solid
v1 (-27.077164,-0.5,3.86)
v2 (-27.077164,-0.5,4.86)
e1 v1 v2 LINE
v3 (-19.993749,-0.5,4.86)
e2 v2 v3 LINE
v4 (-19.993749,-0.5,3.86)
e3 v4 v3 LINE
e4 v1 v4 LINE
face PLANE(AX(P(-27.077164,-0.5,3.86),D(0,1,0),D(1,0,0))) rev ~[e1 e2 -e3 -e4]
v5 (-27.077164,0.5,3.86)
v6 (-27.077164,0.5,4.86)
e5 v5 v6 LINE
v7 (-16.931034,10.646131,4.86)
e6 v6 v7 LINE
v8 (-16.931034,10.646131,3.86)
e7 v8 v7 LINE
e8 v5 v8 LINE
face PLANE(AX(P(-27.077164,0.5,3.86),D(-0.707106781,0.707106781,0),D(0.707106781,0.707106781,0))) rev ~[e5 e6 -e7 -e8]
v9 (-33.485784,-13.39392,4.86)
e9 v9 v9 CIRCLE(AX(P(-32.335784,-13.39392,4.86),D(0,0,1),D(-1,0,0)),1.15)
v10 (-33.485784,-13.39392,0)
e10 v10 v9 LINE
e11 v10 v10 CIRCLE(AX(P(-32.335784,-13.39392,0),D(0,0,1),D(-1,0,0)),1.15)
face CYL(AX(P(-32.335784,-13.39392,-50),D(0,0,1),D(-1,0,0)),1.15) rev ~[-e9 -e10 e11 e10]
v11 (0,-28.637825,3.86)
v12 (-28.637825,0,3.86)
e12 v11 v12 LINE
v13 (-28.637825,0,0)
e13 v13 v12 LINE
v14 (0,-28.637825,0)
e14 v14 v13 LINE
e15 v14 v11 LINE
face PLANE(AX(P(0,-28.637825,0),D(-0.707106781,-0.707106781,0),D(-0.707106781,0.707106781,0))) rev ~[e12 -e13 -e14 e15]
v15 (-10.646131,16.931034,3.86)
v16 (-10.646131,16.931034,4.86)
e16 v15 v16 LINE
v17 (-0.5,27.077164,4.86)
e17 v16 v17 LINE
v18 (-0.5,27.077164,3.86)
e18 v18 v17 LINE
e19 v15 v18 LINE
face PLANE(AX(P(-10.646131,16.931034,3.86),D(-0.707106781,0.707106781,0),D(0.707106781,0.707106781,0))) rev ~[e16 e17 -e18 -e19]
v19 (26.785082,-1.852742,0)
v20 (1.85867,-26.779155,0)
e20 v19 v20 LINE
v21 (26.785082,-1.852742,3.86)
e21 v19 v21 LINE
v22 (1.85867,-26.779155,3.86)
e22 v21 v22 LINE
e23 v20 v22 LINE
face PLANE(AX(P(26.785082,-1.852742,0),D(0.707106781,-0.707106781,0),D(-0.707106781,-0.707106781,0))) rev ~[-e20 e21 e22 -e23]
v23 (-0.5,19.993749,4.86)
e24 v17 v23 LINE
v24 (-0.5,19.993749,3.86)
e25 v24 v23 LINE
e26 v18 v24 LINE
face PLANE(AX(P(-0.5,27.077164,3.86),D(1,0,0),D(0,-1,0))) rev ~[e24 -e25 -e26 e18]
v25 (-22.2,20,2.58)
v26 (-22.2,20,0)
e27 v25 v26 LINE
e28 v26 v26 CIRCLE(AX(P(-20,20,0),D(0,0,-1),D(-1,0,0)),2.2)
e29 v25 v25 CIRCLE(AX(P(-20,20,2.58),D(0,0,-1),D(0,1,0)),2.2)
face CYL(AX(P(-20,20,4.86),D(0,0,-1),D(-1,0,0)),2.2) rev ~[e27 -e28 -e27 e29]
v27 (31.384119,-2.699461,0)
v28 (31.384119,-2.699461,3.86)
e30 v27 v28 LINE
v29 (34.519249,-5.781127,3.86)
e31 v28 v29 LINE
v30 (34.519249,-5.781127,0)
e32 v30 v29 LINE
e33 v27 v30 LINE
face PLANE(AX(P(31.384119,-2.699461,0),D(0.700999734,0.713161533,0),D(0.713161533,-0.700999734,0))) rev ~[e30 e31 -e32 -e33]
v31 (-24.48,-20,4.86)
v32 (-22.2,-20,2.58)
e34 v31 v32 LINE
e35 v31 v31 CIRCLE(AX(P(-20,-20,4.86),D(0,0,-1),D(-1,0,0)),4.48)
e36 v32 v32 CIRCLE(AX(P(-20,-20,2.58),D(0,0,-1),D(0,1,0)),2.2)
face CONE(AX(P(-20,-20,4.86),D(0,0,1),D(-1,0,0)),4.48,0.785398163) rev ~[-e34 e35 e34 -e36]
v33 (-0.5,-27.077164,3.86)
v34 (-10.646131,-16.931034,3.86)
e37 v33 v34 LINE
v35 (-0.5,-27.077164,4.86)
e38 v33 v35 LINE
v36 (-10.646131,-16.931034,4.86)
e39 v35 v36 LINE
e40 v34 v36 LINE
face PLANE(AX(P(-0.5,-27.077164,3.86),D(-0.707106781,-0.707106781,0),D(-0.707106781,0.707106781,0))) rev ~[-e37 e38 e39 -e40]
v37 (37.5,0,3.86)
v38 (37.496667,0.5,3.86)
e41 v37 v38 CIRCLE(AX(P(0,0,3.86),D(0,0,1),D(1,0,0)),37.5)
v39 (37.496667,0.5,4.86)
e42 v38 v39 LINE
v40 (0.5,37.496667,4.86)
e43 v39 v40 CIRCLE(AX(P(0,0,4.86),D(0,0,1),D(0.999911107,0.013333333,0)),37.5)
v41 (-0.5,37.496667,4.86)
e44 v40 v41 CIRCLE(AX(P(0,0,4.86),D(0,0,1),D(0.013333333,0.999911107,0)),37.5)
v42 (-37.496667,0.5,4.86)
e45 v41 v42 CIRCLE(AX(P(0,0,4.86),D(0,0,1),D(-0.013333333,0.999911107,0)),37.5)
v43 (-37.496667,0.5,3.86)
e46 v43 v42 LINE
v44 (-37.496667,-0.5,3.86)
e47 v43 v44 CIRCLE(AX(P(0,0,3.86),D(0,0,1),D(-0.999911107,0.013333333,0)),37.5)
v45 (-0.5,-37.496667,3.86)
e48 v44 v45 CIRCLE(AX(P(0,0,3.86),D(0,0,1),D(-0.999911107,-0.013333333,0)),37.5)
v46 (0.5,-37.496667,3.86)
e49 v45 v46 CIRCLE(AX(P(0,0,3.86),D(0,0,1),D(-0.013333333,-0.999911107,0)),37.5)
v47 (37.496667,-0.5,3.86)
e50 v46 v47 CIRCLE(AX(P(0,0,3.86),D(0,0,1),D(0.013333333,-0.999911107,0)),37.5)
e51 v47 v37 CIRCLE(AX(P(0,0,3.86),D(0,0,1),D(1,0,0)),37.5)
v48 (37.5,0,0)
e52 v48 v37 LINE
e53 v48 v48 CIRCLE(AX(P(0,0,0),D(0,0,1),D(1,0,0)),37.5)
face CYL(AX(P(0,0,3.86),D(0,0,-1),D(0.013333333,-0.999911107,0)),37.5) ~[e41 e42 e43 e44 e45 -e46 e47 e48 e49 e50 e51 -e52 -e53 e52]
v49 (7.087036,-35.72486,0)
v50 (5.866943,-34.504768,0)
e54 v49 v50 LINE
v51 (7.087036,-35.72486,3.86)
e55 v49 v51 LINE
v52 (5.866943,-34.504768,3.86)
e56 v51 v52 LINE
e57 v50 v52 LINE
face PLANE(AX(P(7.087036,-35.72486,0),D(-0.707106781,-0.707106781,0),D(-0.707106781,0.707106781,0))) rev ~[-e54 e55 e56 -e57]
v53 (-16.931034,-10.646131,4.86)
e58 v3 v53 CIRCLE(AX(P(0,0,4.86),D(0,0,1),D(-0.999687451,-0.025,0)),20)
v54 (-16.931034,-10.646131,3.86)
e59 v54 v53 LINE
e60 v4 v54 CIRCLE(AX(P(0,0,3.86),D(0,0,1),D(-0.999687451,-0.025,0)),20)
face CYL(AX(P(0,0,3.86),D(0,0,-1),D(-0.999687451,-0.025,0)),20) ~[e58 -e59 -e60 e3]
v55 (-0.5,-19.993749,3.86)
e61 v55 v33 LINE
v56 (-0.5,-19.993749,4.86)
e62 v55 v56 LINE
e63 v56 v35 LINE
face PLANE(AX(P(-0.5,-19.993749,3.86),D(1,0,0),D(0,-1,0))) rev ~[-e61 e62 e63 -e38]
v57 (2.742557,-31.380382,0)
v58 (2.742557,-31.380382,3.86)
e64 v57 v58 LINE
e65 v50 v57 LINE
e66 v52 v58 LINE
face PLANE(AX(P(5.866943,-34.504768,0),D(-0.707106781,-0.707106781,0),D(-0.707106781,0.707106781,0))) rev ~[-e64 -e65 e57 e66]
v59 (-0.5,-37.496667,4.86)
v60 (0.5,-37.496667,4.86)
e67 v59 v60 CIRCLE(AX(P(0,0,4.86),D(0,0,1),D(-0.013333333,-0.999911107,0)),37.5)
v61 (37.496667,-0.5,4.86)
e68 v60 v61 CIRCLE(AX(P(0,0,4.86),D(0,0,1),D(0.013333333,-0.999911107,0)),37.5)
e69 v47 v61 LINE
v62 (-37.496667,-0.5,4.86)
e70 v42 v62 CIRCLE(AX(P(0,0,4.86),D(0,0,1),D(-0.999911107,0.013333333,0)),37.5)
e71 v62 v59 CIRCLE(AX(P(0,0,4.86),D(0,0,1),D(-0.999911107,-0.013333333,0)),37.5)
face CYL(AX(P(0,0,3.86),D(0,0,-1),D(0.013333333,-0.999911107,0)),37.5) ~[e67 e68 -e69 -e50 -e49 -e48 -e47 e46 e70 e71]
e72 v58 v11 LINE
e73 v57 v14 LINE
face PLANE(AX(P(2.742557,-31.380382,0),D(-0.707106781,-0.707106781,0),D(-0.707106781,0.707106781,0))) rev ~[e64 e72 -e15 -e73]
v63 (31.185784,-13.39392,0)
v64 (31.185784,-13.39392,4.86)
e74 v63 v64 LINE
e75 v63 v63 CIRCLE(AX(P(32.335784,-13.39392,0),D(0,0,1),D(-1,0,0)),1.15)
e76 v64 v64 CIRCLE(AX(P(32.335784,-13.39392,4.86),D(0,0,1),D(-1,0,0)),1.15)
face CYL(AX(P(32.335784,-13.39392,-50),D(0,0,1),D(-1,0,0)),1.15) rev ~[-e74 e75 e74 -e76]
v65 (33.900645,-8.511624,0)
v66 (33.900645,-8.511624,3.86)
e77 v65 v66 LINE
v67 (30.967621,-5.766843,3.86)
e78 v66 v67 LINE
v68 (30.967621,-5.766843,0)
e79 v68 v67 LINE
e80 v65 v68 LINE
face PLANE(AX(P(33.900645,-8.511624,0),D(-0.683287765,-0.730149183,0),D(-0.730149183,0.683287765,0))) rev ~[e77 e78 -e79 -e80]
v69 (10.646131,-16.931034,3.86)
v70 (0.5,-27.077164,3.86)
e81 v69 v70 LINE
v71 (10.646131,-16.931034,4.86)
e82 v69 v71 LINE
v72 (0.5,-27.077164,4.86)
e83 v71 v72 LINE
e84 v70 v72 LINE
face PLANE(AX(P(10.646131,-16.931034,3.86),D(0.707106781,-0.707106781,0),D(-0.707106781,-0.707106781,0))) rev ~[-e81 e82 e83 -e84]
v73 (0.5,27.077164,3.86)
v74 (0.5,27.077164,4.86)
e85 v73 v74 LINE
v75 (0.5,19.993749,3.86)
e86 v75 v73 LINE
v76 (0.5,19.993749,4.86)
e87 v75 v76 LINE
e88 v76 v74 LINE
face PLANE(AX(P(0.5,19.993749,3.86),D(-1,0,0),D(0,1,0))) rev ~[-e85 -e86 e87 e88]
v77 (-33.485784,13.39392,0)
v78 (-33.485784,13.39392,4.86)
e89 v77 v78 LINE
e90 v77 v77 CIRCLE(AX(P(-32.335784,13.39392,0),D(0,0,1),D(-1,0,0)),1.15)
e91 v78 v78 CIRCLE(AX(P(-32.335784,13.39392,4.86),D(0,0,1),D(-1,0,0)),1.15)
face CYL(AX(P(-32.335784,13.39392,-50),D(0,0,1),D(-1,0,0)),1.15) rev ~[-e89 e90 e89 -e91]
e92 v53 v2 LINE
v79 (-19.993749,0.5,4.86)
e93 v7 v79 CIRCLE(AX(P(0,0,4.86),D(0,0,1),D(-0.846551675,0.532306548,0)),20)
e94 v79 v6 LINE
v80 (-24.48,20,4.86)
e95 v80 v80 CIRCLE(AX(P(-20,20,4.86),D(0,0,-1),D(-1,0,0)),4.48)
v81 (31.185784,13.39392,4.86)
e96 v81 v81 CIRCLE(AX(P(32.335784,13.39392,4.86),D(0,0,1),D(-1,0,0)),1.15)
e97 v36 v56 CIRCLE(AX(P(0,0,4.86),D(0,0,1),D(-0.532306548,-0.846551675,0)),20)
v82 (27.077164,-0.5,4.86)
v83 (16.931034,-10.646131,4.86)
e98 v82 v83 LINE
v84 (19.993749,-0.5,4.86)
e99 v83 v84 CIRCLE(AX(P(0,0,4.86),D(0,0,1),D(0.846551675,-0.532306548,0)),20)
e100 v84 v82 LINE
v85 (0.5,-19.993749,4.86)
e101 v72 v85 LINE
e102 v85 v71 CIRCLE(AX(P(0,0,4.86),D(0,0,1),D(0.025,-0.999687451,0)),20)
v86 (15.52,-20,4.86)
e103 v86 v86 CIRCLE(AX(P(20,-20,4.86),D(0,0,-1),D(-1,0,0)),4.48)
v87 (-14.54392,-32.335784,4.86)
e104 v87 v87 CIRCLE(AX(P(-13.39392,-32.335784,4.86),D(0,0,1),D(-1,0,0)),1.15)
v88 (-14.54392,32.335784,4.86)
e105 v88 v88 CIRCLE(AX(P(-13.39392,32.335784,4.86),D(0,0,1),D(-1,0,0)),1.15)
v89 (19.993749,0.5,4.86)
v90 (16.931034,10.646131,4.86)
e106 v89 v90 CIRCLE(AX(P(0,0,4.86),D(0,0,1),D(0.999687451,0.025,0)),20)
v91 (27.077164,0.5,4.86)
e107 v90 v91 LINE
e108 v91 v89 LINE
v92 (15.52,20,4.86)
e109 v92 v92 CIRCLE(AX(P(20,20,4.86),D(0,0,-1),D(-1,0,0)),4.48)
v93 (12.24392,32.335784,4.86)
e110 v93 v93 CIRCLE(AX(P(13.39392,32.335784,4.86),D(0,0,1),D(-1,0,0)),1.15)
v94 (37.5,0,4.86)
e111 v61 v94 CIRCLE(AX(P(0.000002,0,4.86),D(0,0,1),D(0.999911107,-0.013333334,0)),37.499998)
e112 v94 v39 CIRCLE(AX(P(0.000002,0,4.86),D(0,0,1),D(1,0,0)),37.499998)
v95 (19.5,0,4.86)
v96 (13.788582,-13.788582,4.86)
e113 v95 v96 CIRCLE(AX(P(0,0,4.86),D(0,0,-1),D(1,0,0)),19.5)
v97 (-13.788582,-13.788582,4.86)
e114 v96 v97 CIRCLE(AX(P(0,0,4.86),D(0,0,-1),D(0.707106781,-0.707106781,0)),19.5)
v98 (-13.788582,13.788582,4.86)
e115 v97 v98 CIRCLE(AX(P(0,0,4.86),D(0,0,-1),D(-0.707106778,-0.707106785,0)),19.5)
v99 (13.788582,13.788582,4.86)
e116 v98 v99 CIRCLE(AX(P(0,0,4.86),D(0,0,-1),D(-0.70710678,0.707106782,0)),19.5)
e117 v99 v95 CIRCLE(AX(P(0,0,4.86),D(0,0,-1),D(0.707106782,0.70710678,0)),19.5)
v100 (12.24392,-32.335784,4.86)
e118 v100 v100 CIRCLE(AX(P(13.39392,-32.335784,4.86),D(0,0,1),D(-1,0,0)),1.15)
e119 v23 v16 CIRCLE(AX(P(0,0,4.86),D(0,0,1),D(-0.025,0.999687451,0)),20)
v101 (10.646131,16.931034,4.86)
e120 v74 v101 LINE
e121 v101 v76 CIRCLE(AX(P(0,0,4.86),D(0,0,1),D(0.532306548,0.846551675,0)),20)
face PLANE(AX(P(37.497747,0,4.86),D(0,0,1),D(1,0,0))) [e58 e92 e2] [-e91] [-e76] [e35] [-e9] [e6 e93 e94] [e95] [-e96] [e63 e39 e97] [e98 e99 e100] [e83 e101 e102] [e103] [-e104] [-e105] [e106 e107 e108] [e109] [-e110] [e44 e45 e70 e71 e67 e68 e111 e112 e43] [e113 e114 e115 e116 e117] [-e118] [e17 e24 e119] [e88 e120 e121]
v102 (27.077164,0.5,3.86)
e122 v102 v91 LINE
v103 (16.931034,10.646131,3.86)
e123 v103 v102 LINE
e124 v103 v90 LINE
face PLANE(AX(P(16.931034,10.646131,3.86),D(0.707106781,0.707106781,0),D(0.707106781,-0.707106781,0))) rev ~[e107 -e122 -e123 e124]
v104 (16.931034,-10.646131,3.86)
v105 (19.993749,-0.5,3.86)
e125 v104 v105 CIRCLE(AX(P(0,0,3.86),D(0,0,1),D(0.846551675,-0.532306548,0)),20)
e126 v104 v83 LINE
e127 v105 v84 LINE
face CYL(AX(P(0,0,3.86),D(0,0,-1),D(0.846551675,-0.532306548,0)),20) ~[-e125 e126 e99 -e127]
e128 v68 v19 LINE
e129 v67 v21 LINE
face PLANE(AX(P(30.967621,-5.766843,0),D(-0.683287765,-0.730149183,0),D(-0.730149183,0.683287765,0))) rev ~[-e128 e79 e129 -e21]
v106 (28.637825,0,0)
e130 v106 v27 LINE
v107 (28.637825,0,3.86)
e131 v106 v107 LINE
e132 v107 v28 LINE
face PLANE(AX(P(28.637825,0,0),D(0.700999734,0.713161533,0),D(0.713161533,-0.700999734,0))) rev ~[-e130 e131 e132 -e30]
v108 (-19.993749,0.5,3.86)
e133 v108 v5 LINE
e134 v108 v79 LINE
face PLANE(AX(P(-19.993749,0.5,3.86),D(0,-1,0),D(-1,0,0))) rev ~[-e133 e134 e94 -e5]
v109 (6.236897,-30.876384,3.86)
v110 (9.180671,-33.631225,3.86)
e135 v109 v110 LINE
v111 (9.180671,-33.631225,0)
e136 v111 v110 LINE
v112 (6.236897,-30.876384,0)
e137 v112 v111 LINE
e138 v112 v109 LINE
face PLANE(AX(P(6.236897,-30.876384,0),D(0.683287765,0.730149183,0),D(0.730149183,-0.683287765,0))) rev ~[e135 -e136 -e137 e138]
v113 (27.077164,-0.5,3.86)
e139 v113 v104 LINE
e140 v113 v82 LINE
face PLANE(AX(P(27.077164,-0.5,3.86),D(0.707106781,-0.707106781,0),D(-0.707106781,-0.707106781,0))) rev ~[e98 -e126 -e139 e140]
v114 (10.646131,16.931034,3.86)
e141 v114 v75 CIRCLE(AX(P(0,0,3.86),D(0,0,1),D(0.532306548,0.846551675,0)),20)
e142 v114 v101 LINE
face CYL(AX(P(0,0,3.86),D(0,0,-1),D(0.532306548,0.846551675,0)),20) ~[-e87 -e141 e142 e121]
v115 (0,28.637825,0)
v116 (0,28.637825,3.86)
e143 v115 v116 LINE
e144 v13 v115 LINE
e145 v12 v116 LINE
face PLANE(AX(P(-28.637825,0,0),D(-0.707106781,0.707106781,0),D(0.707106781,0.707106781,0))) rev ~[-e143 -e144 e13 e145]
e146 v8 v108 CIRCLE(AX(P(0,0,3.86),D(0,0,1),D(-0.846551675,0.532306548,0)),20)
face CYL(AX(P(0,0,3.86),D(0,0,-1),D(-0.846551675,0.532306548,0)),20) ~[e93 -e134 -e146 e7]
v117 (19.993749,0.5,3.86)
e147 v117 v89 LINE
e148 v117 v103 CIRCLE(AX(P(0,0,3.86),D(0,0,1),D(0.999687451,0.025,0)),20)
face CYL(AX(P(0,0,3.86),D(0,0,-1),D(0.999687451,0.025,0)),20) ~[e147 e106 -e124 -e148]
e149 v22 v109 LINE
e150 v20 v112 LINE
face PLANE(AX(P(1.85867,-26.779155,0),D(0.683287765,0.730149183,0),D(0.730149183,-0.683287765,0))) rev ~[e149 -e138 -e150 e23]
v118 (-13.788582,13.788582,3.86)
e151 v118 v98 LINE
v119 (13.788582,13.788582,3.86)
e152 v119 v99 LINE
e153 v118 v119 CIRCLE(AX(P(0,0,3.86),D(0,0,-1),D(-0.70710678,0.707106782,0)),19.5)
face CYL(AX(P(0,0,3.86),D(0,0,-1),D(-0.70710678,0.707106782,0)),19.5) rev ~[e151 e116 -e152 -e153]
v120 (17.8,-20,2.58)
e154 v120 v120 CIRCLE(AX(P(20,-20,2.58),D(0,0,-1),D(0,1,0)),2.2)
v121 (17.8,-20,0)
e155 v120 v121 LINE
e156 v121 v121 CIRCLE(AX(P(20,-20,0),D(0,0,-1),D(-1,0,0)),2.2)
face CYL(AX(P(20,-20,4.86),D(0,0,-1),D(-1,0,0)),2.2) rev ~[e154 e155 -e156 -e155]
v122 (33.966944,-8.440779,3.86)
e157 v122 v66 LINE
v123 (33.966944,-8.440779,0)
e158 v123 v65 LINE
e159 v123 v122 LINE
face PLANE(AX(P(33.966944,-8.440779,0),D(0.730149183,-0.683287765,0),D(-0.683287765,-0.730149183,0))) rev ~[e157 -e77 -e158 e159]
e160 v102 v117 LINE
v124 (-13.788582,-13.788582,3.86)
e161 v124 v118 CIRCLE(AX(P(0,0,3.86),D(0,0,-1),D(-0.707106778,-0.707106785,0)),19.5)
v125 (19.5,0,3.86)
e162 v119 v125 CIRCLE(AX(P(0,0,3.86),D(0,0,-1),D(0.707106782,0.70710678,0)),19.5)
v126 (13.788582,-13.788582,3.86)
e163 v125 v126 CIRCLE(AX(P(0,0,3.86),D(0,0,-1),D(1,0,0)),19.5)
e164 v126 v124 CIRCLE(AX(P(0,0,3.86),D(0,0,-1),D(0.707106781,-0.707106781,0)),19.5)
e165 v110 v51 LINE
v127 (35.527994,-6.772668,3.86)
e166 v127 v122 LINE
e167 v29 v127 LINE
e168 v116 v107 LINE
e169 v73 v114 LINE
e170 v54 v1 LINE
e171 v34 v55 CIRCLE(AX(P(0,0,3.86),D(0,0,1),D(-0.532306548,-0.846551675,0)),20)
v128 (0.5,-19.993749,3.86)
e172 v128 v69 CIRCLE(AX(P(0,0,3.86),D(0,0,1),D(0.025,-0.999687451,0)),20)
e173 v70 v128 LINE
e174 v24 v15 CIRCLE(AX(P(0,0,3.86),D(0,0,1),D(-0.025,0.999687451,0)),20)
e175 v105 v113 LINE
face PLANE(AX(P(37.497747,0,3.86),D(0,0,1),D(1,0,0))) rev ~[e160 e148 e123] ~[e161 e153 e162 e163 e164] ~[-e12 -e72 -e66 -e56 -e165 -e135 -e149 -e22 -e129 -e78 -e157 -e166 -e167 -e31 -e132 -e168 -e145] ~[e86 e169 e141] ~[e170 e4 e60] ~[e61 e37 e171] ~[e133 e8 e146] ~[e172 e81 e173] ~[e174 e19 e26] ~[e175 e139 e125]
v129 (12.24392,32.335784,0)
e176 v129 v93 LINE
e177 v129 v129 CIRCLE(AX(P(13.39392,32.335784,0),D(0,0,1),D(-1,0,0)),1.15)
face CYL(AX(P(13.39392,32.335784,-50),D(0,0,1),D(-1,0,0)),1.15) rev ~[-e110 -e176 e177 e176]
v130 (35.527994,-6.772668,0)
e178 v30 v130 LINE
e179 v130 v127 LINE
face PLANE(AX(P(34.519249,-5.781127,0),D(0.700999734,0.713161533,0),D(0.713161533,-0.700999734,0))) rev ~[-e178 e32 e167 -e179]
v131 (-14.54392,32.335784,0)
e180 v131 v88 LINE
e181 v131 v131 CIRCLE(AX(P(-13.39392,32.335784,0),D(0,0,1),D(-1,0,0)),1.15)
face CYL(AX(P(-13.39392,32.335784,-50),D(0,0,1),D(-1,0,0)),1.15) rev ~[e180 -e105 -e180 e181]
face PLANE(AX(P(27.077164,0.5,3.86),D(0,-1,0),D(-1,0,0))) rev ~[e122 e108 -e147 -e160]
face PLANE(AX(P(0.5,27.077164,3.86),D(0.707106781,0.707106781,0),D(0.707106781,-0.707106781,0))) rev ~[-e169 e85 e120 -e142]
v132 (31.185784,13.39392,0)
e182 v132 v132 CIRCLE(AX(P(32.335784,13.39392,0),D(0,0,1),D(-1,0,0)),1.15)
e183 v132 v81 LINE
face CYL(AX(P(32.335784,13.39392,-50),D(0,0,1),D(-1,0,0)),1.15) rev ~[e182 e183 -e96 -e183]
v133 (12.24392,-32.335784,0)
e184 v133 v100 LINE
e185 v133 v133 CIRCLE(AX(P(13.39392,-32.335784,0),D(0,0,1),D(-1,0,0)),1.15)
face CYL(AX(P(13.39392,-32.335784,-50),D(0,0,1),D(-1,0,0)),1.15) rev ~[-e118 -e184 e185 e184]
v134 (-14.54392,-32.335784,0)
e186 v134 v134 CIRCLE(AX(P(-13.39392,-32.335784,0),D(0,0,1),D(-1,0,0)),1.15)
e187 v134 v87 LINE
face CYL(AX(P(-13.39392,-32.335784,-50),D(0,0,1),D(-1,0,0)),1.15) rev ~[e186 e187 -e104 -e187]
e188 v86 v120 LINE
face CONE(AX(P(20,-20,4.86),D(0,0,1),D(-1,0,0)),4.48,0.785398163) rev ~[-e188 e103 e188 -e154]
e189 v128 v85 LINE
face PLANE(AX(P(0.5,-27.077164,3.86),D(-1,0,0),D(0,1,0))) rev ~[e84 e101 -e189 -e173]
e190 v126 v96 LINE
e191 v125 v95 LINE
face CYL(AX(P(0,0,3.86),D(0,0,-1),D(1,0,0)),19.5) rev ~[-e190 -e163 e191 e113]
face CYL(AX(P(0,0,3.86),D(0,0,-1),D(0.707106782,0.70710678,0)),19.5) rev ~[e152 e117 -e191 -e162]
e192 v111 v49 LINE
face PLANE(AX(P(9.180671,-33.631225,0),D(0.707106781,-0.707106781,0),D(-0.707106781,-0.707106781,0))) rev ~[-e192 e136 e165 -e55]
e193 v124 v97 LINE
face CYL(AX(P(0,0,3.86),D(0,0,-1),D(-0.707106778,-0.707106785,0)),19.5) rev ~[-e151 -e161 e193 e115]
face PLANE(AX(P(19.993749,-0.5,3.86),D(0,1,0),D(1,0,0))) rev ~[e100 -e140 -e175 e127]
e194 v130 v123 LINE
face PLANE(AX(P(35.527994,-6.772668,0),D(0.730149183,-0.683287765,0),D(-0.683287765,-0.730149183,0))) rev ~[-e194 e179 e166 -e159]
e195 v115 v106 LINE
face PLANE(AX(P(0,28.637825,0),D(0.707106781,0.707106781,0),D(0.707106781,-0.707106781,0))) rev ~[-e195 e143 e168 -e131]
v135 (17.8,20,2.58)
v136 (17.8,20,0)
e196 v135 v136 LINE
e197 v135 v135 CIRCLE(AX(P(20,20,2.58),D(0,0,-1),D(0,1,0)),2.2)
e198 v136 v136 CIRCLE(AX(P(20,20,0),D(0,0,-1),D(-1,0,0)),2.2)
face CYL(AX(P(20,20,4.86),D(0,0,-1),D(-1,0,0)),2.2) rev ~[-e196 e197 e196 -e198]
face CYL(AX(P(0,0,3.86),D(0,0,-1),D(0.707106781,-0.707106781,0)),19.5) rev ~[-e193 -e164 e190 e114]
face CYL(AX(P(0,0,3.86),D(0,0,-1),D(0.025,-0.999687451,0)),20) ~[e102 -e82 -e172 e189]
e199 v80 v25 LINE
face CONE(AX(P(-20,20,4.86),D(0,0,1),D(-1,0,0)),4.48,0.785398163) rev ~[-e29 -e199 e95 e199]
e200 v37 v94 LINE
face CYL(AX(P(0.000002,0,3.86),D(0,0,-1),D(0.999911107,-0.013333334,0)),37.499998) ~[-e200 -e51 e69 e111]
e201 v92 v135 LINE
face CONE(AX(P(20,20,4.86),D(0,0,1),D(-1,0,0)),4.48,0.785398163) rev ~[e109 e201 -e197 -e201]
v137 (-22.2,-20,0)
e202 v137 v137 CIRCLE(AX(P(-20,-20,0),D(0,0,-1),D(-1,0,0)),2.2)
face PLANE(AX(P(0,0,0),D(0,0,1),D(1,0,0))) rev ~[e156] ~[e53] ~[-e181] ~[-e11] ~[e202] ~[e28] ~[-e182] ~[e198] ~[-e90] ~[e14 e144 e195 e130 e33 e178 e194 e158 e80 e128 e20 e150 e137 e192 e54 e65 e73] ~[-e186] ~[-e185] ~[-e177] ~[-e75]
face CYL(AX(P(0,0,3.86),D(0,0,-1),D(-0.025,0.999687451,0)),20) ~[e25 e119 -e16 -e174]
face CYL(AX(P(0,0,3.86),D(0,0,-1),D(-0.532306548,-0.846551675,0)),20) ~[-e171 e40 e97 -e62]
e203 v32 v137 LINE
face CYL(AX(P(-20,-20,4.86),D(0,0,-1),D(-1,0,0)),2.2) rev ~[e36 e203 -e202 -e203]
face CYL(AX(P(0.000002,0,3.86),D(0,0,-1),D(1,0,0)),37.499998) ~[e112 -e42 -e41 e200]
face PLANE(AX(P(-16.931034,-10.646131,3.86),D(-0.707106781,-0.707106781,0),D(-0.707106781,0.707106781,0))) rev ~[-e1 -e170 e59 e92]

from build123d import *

# Parameters (mm, degrees)
F0_R           = 37.5
F1_DEPTH       = 3.86
F3_DEPTH       = 1
F5_D           = 4.4
F5_DEPTH       = 50
F5_CSINK_D     = 8.96
F5_CSINK_ANGLE = 90
F5_TIP         = 1.3218933619
F6_D           = 2.3
F6_DEPTH       = 50
F6_TIP         = 0.6909897119


# Not quite as in the source:
# - a feature names something its author has since deleted; it is built from what else it names


with BuildPart() as f1:
    # F0 (on Top) → F1 (new body)
    with BuildSketch(Plane.XY):
        Circle(F0_R)
        with BuildLine():
            Line((35.5279936079, -6.7726684482), (33.9669435175, -8.4407788788))
            ThreePointArc((33.9669435175, -8.4407788788), (24.9465264027, -24.5493547866), (8.9847812304, -33.8271149559))
            Line((8.9847812304, -33.8271149559), (7.0870357741, -35.7248604122))
            Line((7.0870357741, -35.7248604122), (5.8669428771, -34.5047675152))
            Line((5.8669428771, -34.5047675152), (2.7425574301, -31.3803820681))
            ThreePointArc((2.7425574301, -31.3803820681), (-22.2891525488, 22.2585641643), (31.3841187925, -2.6994606157))
            Line((31.3841187925, -2.6994606157), (34.5192493346, -5.7811266526))
            Line((34.5192493346, -5.7811266526), (35.5279936079, -6.7726684482))
        make_face(mode=Mode.SUBTRACT)
        with BuildLine():
            Line((28.6378246381, 0), (31.3841187925, -2.6994606157))
            ThreePointArc((31.3841187925, -2.6994606157), (-22.2891525488, 22.2585641643), (2.7425574301, -31.3803820681))
            Line((2.7425574301, -31.3803820681), (0, -28.6378246381))
            Line((0, -28.6378246381), (-28.6378246381, 0))
            Line((-28.6378246381, 0), (0, 28.6378246381))
            Line((0, 28.6378246381), (28.6378246381, 0))
        make_face()
        with BuildLine():
            Line((30.967620581, -5.7668427717), (26.7850823006, -1.8527423374))
            Line((26.7850823006, -1.8527423374), (1.8586698278, -26.7791548102))
            Line((1.8586698278, -26.7791548102), (6.2368967636, -30.8763844833))
            ThreePointArc((6.2368967636, -30.8763844833), (22.442510977, -22.1039295386), (30.967620581, -5.7668427717))
        make_face()
        with BuildLine():
            Line((33.9006451973, -8.5116240875), (30.967620581, -5.7668427717))
            ThreePointArc((30.967620581, -5.7668427717), (22.442510977, -22.1039295386), (6.2368967636, -30.8763844833))
            Line((6.2368967636, -30.8763844833), (9.1806708369, -33.6312253494))
            Line((9.1806708369, -33.6312253494), (8.9847812304, -33.8271149559))
            ThreePointArc((8.9847812304, -33.8271149559), (24.9465264027, -24.5493547866), (33.9669435175, -8.4407788788))
            Line((33.9669435175, -8.4407788788), (33.9006451973, -8.5116240875))
        make_face()
    extrude(amount=F1_DEPTH)

    # F2 (on face) → F3 (join)
    with BuildSketch(Plane.XY.offset(3.86)):
        with BuildLine():
            ThreePointArc((37.4966665185, -0.5), (37.4991666204, -0.250005556), (37.5, 0))
            ThreePointArc((37.5, 0), (37.4991666204, 0.250005556), (37.4966665185, 0.5))
            Line((37.4966665185, 0.5), (37.4966665185, -0.5))
        make_face()
        with BuildLine():
            Line((37.4966665185, -0.5), (37.4966665185, 0.5))
            ThreePointArc((37.4966665185, 0.5), (26.5165042945, 26.5165042945), (0.5, 37.4966665185))
            Line((0.5, 37.4966665185), (-0.5, 37.4966665185))
            ThreePointArc((-0.5, 37.4966665185), (-26.5165042945, 26.5165042945), (-37.4966665185, 0.5))
            Line((-37.4966665185, 0.5), (-37.4966665185, -0.5))
            ThreePointArc((-37.4966665185, -0.5), (-26.5165042945, -26.5165042945), (-0.5, -37.4966665185))
            Line((-0.5, -37.4966665185), (0.5, -37.4966665185))
            ThreePointArc((0.5, -37.4966665185), (26.5165042945, -26.5165042945), (37.4966665185, -0.5))
        make_face()
        with BuildLine():
            Line((-0.5, -27.0771644663), (-10.6461309606, -16.9310335056))
            ThreePointArc((-10.6461309606, -16.9310335056), (-5.7796293509, -19.1466938286), (-0.5, -19.9937490231))
            Line((-0.5, -19.9937490231), (-0.5, -27.0771644663))
        make_face(mode=Mode.SUBTRACT)
        with BuildLine():
            ThreePointArc((-19.9937490231, -0.5), (-19.1466938286, -5.7796293509), (-16.9310335056, -10.6461309606))
            Line((-16.9310335056, -10.6461309606), (-27.0771644663, -0.5))
            Line((-27.0771644663, -0.5), (-19.9937490231, -0.5))
        make_face(mode=Mode.SUBTRACT)
        with BuildLine():
            ThreePointArc((0.5, -19.9937490231), (5.7796293509, -19.1466938286), (10.6461309606, -16.9310335056))
            Line((10.6461309606, -16.9310335056), (0.5, -27.0771644663))
            Line((0.5, -27.0771644663), (0.5, -19.9937490231))
        make_face(mode=Mode.SUBTRACT)
        with BuildLine():
            Line((27.0771644663, -0.5), (16.9310335056, -10.6461309606))
            ThreePointArc((16.9310335056, -10.6461309606), (19.1466938286, -5.7796293509), (19.9937490231, -0.5))
            Line((19.9937490231, -0.5), (27.0771644663, -0.5))
        make_face(mode=Mode.SUBTRACT)
        with BuildLine():
            Line((-27.0771644663, 0.5), (-16.9310335056, 10.6461309606))
            ThreePointArc((-16.9310335056, 10.6461309606), (-19.1466938286, 5.7796293509), (-19.9937490231, 0.5))
            Line((-19.9937490231, 0.5), (-27.0771644663, 0.5))
        make_face(mode=Mode.SUBTRACT)
        with BuildLine():
            ThreePointArc((-0.5, 19.9937490231), (-5.7796293509, 19.1466938286), (-10.6461309606, 16.9310335056))
            Line((-10.6461309606, 16.9310335056), (-0.5, 27.0771644663))
            Line((-0.5, 27.0771644663), (-0.5, 19.9937490231))
        make_face(mode=Mode.SUBTRACT)
        with BuildLine():
            ThreePointArc((13.7885822494, 13.7885822168), (18.0156508884, 7.4623269205), (19.5, 0))
            ThreePointArc((19.5, 0), (18.015650884, -7.4623269311), (13.7885822331, -13.7885822331))
            ThreePointArc((13.7885822331, -13.7885822331), (4.88e-08, -19.5), (-13.7885821641, -13.7885823022))
            ThreePointArc((-13.7885821641, -13.7885823022), (-19.5, -3.62e-08), (-13.7885822154, 13.7885822509))
            ThreePointArc((-13.7885822154, 13.7885822509), (2.41e-08, 19.5), (13.7885822494, 13.7885822168))
        make_face(mode=Mode.SUBTRACT)
        with BuildLine():
            ThreePointArc((19.9937490231, 0.5), (19.1466938286, 5.7796293509), (16.9310335056, 10.6461309606))
            Line((16.9310335056, 10.6461309606), (27.0771644663, 0.5))
            Line((27.0771644663, 0.5), (19.9937490231, 0.5))
        make_face(mode=Mode.SUBTRACT)
        with BuildLine():
            Line((0.5, 27.0771644663), (10.6461309606, 16.9310335056))
            ThreePointArc((10.6461309606, 16.9310335056), (5.7796293509, 19.1466938286), (0.5, 19.9937490231))
            Line((0.5, 19.9937490231), (0.5, 27.0771644663))
        make_face(mode=Mode.SUBTRACT)
        with BuildLine():
            Line((-0.5, 37.4966665185), (0.5, 37.4966665185))
            ThreePointArc((0.5, 37.4966665185), (0, 37.5), (-0.5, 37.4966665185))
        make_face()
        with BuildLine():
            ThreePointArc((-0.5, -37.4966665185), (0, -37.5), (0.5, -37.4966665185))
            Line((0.5, -37.4966665185), (-0.5, -37.4966665185))
        make_face()
        with BuildLine():
            Line((-37.4966665185, -0.5), (-37.4966665185, 0.5))
            ThreePointArc((-37.4966665185, 0.5), (-37.5, 0), (-37.4966665185, -0.5))
        make_face()
    extrude(amount=F3_DEPTH)

    # F5
    with Locations(Plane.XY.offset(4.86)):
        with Locations((-20, -20), (20, -20), (20, 20), (-20, 20)):
            CounterSinkHole(F5_D / 2, F5_CSINK_D / 2, depth=F5_DEPTH, counter_sink_angle=F5_CSINK_ANGLE)
            with Locations((0, 0, -(F5_DEPTH + F5_TIP / 2))):  # 118° drill point
                Cone(0, F5_D / 2, F5_TIP, mode=Mode.SUBTRACT)

    # F6
    with Locations(Plane(origin=(0, 0, 0), x_dir=(1, 0, 0), z_dir=(0, 0, -1))):
        with Locations((-32.3357836379, -13.3939201328), (-13.3939201328, -32.3357836379), (13.3939201328, -32.3357836379), (32.3357836379, -13.3939201328), (32.3357836379, 13.3939201328), (13.3939201328, 32.3357836379), (-13.3939201328, 32.3357836379), (-32.3357836379, 13.3939201328)):
            Hole(F6_D / 2, depth=F6_DEPTH)
            with Locations((0, 0, -(F6_DEPTH + F6_TIP / 2))):  # 118° drill point
                Cone(0, F6_D / 2, F6_TIP, mode=Mode.SUBTRACT)


solid = f1.part
